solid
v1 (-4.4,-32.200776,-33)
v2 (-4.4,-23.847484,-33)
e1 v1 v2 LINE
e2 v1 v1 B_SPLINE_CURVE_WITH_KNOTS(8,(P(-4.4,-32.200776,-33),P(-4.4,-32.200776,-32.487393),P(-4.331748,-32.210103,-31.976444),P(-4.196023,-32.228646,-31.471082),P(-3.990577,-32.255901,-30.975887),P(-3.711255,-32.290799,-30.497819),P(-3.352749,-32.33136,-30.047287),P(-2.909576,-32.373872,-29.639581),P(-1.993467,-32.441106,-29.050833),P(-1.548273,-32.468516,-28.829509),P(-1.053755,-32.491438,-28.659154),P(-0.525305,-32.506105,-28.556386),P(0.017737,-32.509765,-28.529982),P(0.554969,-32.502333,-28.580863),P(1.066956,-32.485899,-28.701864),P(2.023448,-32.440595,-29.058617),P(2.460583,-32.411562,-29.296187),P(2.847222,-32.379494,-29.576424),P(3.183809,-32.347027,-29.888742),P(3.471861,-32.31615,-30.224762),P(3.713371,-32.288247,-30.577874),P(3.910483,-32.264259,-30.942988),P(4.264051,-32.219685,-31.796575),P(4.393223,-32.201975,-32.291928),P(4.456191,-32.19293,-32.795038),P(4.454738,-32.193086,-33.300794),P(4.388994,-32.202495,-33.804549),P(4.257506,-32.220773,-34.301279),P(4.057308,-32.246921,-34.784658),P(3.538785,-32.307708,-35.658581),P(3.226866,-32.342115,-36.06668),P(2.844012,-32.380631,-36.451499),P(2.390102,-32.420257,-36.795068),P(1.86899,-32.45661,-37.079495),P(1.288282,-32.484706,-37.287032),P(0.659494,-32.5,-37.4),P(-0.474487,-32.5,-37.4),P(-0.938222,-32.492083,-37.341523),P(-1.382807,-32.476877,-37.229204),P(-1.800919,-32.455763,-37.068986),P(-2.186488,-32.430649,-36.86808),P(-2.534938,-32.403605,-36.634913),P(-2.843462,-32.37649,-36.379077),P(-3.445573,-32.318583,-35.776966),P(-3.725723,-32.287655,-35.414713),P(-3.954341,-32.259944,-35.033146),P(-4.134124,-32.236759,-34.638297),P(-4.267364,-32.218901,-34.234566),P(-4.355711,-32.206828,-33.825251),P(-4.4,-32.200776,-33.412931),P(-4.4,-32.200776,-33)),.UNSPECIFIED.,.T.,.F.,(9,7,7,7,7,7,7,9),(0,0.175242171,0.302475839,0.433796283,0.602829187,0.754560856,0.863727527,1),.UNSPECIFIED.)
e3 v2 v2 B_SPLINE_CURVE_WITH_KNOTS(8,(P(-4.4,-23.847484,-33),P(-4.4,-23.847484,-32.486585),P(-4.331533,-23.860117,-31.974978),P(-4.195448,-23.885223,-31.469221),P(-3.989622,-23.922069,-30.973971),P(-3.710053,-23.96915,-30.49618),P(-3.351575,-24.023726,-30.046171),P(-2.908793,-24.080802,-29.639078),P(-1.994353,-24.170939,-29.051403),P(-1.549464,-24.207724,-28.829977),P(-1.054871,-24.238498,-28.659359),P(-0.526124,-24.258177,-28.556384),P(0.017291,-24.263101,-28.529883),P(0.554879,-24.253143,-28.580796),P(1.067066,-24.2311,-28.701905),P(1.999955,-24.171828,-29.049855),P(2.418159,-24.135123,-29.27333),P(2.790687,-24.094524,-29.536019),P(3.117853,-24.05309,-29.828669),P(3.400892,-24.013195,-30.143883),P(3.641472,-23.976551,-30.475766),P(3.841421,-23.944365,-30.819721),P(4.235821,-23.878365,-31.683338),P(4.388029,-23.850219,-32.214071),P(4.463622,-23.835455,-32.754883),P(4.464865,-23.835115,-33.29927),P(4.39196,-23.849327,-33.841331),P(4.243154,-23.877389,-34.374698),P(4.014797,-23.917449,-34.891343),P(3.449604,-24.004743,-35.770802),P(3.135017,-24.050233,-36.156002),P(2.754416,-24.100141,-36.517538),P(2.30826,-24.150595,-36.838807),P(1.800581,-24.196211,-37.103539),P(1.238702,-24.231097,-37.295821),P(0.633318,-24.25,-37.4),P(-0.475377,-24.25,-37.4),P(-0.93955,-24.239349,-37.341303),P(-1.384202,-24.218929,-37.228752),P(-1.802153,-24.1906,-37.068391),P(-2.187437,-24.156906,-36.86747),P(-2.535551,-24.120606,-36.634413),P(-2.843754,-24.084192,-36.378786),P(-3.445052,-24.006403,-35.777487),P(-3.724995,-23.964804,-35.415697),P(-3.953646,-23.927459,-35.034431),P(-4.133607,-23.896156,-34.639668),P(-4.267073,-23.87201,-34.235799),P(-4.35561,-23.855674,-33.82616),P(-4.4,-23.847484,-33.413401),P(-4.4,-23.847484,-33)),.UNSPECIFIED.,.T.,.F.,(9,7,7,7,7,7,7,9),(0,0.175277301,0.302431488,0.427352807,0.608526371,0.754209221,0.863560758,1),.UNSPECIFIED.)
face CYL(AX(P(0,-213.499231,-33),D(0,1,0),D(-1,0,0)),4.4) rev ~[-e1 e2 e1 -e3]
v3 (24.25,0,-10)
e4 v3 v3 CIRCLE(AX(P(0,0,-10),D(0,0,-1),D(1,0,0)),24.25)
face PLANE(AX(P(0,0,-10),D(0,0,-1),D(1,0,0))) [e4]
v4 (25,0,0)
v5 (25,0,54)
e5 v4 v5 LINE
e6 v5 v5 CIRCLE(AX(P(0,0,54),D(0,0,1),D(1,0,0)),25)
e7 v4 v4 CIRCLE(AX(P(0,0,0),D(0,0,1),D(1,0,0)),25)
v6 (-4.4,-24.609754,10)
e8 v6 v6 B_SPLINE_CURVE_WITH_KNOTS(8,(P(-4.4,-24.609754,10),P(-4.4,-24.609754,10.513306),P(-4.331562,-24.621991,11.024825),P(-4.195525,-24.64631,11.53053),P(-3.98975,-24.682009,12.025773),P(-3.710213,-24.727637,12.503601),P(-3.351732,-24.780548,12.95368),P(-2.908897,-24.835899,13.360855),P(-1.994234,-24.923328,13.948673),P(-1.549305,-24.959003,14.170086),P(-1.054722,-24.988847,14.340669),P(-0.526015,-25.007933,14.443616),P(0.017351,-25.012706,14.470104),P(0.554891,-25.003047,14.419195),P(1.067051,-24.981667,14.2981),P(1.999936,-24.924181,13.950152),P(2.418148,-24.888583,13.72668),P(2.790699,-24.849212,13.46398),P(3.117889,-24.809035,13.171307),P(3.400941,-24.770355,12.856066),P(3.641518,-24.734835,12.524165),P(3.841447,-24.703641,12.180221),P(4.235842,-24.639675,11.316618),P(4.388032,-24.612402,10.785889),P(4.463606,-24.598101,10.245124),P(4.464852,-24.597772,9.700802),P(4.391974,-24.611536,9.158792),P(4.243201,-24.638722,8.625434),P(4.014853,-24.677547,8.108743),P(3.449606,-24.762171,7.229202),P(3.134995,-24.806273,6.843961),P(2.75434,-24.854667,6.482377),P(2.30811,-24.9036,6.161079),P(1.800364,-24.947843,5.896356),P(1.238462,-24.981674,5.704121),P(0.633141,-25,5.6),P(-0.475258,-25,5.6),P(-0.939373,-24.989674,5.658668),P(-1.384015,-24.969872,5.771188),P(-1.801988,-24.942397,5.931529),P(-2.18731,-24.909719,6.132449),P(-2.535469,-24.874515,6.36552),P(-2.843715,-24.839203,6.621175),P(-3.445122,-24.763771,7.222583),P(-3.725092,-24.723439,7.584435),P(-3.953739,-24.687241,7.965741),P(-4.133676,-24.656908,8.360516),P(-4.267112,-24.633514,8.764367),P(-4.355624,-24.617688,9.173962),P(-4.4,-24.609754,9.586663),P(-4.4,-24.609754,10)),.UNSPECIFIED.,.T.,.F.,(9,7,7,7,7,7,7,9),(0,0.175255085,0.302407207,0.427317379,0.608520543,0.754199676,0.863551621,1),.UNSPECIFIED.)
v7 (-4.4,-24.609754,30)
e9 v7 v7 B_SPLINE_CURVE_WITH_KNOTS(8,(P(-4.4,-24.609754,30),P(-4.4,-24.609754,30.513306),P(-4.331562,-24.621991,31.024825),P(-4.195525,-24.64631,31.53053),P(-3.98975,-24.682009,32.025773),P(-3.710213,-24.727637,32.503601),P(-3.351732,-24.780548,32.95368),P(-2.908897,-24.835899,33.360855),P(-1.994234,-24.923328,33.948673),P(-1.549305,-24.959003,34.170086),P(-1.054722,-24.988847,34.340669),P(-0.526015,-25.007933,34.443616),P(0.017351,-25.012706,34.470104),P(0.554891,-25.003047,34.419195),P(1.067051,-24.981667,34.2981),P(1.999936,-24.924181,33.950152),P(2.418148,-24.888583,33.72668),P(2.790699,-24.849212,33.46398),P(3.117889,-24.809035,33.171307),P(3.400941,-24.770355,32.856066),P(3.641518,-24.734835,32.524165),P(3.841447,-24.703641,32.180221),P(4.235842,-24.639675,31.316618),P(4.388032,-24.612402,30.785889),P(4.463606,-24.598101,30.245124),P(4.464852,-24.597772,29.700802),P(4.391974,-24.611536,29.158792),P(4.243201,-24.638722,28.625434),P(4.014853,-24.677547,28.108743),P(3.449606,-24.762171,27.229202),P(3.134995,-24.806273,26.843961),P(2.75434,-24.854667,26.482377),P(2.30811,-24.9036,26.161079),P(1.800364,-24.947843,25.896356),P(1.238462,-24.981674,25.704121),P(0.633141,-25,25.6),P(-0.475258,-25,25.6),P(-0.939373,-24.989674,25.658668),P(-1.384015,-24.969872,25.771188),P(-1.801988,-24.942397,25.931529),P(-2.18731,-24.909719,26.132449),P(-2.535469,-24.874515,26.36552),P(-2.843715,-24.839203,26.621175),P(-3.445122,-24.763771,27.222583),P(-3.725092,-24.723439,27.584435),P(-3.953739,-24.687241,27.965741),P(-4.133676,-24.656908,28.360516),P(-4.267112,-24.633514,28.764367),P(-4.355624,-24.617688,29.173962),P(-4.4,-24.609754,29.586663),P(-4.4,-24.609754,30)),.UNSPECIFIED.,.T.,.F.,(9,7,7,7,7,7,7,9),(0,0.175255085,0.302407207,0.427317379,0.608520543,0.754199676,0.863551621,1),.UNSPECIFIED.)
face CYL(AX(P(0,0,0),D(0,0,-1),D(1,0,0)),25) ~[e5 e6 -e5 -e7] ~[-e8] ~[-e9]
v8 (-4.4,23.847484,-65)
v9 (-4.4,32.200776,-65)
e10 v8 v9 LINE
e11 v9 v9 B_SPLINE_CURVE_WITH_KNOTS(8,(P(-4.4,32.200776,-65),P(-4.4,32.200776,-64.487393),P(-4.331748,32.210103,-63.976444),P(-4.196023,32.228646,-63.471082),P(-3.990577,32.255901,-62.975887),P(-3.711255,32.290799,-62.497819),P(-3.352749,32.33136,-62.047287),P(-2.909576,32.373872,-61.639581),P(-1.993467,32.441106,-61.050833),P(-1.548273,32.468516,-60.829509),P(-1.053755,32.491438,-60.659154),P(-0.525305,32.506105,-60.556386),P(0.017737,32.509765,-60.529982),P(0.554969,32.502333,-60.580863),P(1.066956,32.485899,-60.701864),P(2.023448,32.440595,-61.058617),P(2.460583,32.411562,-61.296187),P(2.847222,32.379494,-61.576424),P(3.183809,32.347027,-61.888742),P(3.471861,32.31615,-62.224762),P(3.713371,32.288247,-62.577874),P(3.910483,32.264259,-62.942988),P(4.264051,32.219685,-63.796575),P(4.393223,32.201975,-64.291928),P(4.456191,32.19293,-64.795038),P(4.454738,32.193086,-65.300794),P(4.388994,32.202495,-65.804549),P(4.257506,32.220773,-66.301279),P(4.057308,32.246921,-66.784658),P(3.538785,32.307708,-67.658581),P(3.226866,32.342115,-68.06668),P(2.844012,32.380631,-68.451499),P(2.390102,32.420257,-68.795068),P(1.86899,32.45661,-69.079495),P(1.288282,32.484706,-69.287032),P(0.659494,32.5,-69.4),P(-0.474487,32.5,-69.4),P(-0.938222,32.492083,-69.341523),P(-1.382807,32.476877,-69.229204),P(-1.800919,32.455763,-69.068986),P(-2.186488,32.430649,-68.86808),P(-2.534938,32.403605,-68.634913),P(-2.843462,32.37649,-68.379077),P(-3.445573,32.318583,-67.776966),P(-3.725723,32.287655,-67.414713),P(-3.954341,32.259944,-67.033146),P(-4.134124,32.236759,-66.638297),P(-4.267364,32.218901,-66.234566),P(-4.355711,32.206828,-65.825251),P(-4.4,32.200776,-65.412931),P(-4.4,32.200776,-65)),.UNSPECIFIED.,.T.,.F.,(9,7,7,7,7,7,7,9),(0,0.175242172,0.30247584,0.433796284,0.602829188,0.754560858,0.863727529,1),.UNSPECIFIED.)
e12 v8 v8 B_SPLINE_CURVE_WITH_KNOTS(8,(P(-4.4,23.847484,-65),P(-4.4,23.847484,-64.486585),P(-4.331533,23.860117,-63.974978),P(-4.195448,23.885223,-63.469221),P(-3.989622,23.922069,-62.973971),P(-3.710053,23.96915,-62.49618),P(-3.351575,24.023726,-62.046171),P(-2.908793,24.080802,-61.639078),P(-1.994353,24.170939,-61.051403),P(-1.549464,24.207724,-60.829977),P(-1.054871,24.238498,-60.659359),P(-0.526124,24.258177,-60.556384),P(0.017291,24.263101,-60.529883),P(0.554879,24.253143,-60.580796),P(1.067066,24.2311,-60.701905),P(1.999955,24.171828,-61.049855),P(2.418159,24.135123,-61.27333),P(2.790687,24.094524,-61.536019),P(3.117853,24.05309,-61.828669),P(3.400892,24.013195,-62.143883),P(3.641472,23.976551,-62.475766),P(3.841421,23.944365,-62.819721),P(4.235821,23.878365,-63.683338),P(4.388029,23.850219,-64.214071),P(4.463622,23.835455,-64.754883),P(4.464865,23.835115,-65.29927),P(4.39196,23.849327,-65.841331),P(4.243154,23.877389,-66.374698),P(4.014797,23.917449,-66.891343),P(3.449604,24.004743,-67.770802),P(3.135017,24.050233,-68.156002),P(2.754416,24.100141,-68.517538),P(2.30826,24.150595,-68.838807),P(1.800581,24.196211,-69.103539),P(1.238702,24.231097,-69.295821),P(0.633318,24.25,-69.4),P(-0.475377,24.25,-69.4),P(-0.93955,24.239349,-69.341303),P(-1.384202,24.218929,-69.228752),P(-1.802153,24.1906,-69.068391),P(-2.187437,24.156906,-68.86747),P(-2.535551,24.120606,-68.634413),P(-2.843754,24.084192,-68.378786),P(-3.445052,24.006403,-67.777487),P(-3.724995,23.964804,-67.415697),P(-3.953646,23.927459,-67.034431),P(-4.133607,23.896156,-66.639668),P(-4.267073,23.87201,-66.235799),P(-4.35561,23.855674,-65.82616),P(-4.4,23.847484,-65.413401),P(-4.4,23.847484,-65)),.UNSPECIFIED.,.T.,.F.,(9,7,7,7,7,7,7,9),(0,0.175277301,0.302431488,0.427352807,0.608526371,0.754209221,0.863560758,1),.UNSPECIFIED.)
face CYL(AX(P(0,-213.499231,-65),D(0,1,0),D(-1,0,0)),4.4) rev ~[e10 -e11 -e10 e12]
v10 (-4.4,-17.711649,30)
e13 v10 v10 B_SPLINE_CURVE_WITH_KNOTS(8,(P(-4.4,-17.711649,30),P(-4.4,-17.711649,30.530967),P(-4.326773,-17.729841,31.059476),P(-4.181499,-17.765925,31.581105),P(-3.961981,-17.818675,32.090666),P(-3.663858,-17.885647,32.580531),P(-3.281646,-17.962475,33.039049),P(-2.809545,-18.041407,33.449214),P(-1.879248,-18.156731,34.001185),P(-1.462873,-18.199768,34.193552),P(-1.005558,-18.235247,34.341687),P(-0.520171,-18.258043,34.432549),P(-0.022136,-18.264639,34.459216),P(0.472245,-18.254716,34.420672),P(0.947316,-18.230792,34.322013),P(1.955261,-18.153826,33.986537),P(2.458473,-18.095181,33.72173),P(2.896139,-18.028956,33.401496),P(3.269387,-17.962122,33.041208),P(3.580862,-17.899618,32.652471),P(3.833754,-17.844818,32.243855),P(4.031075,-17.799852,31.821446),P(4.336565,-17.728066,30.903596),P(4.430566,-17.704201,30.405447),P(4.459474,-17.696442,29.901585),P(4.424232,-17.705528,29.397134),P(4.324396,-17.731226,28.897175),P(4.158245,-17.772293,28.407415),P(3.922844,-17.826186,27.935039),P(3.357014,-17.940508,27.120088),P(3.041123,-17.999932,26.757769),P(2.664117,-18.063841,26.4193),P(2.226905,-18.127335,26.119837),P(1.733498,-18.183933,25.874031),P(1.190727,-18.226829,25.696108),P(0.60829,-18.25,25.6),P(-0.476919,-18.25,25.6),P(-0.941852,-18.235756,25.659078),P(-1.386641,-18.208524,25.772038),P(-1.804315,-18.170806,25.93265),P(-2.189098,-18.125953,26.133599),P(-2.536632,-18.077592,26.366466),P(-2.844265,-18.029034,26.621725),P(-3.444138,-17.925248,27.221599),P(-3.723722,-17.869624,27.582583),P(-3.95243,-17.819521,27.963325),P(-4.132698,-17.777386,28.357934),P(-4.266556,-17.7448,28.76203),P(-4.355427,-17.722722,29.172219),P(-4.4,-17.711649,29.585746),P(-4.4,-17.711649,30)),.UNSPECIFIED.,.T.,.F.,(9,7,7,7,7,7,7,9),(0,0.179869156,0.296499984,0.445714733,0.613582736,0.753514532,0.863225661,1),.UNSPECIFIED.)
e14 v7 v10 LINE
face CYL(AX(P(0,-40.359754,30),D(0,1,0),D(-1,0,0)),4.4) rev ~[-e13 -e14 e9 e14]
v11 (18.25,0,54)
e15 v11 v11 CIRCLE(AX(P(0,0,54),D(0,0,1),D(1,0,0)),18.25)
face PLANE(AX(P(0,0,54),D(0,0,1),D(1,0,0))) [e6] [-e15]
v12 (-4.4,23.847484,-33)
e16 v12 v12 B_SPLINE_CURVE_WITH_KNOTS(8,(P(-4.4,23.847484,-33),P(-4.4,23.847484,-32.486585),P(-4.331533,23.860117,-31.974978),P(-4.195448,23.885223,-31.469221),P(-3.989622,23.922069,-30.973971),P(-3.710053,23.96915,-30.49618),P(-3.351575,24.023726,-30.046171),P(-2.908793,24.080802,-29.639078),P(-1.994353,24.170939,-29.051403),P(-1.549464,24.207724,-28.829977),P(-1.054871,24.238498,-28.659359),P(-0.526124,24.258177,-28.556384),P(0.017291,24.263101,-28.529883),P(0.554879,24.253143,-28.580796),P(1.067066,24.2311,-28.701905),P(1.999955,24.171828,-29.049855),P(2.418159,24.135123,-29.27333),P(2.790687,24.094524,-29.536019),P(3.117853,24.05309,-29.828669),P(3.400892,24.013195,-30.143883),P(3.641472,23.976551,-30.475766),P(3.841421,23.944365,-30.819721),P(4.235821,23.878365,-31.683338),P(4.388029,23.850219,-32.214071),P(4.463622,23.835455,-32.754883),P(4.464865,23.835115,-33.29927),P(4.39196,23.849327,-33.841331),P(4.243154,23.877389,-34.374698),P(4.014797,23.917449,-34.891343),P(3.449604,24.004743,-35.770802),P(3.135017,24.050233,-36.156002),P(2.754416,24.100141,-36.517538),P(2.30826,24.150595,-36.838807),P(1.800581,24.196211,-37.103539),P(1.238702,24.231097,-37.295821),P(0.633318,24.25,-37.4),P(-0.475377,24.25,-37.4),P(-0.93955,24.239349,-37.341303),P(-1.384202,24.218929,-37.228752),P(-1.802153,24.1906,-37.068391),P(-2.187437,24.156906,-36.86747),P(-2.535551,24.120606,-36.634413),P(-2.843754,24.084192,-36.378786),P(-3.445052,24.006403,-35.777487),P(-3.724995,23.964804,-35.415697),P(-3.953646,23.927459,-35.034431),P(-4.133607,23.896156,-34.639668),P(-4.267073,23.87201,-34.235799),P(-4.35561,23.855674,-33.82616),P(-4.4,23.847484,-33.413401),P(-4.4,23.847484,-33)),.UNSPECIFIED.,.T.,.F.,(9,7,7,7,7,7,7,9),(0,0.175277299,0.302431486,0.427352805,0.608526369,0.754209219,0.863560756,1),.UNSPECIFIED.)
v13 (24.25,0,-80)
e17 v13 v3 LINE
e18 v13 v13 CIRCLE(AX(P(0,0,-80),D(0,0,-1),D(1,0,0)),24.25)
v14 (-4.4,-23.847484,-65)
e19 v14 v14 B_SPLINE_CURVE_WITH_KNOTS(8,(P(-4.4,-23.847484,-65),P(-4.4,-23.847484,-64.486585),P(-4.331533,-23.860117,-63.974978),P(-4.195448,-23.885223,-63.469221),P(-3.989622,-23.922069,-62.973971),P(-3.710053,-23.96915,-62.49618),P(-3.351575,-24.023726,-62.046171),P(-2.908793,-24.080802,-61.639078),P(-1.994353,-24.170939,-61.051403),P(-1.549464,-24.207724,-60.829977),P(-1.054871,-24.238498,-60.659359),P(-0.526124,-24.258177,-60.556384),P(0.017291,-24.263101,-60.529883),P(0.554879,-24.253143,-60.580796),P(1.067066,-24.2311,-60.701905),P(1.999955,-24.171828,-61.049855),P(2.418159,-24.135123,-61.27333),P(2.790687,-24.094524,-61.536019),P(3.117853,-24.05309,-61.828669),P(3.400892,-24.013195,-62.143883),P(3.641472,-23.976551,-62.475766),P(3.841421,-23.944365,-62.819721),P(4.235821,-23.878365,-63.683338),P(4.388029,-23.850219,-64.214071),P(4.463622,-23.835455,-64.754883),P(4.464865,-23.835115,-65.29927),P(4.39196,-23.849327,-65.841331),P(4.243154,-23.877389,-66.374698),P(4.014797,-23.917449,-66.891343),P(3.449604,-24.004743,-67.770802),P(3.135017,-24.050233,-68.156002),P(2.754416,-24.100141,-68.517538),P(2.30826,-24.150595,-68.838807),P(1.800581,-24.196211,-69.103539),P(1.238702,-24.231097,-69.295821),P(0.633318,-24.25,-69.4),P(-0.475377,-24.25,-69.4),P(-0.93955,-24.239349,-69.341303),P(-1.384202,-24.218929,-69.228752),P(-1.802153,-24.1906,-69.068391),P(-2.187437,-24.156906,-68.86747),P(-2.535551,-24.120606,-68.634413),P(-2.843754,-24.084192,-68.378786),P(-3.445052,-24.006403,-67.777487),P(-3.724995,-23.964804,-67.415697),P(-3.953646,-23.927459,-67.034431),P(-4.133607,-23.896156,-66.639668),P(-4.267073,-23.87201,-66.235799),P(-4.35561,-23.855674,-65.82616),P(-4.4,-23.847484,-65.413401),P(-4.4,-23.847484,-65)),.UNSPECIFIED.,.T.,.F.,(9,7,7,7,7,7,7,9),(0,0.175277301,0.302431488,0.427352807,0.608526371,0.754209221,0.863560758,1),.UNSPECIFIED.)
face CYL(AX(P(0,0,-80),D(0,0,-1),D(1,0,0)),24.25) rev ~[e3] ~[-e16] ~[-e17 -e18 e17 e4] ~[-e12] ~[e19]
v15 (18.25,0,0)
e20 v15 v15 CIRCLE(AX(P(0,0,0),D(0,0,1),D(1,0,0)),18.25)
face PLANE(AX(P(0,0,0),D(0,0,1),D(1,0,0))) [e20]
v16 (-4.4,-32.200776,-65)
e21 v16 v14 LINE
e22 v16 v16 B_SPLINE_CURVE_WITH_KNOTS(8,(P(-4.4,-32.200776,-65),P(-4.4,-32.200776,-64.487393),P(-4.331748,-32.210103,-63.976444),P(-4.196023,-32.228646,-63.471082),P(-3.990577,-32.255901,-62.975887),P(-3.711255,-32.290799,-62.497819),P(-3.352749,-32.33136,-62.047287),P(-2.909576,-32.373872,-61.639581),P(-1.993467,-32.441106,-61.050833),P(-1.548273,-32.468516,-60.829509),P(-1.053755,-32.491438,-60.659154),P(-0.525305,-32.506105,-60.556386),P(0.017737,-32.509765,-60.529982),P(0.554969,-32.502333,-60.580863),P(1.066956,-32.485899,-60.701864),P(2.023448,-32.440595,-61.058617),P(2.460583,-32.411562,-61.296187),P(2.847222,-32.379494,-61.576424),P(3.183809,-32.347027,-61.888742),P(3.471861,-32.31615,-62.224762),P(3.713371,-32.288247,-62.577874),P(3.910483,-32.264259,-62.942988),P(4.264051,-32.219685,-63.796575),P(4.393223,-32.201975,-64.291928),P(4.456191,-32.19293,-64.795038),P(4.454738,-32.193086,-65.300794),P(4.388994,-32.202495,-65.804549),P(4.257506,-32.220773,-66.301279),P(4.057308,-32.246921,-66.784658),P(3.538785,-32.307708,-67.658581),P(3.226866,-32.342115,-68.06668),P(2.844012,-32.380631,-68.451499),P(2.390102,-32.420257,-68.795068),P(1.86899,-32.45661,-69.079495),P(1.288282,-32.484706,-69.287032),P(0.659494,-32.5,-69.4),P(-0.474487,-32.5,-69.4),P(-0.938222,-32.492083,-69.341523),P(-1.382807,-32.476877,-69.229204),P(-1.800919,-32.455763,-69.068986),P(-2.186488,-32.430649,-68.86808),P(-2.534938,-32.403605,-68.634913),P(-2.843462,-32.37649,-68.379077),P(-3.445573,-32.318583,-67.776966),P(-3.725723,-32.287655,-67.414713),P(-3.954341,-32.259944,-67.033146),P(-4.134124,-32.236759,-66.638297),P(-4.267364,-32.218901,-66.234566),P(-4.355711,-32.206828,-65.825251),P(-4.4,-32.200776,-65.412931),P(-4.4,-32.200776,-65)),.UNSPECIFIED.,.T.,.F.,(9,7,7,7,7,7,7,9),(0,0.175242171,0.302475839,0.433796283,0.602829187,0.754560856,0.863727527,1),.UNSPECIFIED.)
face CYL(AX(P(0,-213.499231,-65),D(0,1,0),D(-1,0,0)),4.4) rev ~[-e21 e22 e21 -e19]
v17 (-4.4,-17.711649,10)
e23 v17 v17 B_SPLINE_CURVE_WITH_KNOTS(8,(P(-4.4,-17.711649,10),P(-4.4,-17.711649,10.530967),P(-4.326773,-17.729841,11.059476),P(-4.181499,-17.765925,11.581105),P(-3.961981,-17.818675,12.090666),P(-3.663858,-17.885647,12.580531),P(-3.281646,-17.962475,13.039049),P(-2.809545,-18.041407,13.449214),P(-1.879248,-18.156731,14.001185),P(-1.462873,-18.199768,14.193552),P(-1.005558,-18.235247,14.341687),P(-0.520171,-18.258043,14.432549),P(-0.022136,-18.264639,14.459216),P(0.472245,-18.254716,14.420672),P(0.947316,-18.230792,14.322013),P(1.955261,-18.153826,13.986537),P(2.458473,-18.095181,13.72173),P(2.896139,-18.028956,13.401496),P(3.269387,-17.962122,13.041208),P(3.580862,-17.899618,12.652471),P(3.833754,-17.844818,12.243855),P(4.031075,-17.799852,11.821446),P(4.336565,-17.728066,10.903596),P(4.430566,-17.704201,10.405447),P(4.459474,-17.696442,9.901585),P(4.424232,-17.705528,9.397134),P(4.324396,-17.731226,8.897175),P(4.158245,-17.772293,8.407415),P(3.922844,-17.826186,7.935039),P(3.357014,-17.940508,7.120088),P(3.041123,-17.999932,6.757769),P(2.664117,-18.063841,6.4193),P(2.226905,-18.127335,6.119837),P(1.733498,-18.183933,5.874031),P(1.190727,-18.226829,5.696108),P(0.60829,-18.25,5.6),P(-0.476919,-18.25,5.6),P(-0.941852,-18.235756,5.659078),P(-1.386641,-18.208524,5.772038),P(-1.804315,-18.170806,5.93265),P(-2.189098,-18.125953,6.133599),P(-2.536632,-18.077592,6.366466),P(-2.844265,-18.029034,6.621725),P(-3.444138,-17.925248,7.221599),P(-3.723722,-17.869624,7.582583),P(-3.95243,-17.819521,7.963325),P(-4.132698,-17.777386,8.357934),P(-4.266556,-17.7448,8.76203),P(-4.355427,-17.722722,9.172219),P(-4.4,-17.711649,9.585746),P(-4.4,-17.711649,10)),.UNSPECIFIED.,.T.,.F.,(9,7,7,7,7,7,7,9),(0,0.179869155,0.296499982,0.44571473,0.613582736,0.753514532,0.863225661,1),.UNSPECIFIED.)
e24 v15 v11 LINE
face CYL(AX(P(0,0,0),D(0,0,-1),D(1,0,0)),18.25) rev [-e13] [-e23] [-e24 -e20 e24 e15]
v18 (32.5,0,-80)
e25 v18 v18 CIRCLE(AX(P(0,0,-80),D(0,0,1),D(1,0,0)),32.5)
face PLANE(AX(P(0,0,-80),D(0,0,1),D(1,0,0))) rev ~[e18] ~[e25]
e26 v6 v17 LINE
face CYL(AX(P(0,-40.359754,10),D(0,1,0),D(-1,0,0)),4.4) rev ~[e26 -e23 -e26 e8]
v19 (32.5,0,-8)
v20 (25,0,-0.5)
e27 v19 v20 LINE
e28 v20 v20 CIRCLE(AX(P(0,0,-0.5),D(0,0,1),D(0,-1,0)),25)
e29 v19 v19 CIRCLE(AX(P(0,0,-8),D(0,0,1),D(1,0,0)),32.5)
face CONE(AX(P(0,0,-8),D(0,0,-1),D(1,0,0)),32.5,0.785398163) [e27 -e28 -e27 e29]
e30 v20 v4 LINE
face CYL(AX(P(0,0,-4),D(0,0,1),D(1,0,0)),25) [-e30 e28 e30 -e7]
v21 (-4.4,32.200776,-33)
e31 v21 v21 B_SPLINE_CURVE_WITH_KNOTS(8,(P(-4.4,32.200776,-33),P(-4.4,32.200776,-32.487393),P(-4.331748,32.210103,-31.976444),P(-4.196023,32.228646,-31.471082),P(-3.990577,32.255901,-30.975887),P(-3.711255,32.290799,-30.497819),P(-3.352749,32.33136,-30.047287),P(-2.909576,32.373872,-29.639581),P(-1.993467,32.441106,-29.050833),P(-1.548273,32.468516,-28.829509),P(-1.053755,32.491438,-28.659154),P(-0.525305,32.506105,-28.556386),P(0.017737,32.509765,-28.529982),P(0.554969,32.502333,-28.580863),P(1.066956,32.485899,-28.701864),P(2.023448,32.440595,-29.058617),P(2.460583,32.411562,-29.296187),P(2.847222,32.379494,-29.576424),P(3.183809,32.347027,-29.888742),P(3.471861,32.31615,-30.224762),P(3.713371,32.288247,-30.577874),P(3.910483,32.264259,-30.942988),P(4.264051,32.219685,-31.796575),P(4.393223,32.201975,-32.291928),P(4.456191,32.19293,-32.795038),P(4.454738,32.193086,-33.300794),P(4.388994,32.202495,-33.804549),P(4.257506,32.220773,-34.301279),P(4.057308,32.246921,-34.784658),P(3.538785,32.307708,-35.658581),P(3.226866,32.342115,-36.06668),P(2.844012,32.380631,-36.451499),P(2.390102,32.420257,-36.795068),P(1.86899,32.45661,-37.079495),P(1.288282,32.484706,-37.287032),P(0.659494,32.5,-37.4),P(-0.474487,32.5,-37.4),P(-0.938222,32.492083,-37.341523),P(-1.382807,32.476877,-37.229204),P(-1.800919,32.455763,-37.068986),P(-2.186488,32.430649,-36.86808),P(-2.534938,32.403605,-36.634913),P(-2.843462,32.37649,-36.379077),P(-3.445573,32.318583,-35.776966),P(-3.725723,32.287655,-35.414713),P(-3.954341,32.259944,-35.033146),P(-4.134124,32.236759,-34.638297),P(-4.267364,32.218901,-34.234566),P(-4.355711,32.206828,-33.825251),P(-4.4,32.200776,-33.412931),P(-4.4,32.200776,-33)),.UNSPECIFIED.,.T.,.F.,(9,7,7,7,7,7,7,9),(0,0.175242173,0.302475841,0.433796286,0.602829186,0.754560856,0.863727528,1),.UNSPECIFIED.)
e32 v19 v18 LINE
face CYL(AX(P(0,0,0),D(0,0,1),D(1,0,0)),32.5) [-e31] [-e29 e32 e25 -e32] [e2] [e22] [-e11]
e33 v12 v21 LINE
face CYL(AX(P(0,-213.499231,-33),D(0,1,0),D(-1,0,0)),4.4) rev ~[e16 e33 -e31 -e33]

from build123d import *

# Parameters (mm, degrees)
F0_R        = 25
F0_R_2      = 18.25
F1_DEPTH    = 54
F4_D        = 8.8
F4_DEPTH    = 15.75
F4_START    = 1.3902459
F4_TIP      = 2.6437867237
F5_R        = 32.5
F6_DEPTH    = 80
F7_R        = 24.25
F8_DEPTH    = 70
F9_S5_R     = 25
F9_T6_DEPTH = 48
F12_D       = 8.8


# Not quite as in the source:
# - a fillet or chamfer that OpenCascade refuses, or shapes differently, is made with other operations: its cross-section is extruded or revolved along the edge and cut away or added


with BuildPart() as f1:
    # F0 (on Top) → F1 (new body)
    with BuildSketch(Plane.XY):
        Circle(F0_R)
        Circle(F0_R_2, mode=Mode.SUBTRACT)
    extrude(amount=F1_DEPTH)

    # F4
    # its depths count from where the whole tool has entered the part; down to there all is cleared
    with Locations(Plane.XZ.offset(26).offset(-F4_START)):
        with Locations((0, 10), (0, 30)):
            Hole(F4_D / 2, depth=F4_DEPTH)
            with Locations((0, 0, -(F4_DEPTH + F4_TIP / 2))):  # 118° drill point
                Cone(0, F4_D / 2, F4_TIP, mode=Mode.SUBTRACT)

    # F5 (on face) → F6 (join)
    with BuildSketch(Plane.XY):
        Circle(F5_R)
    extrude(amount=-F6_DEPTH)

    # F7 (on face) → F8 (cut)
    with BuildSketch(Plane(origin=(0, 0, -80), x_dir=(1, 0, 0), z_dir=(0, 0, -1))):
        Circle(F7_R)
    extrude(amount=-F8_DEPTH, mode=Mode.SUBTRACT)

    # F9: chamfer of 8 on 1 edges, made by hand


with BuildPart() as f9_tool2:
    # F9_s3 → F9_t4 (revolve)
    with BuildSketch(Plane.XZ):
        Polygon((32.5, -8), (24.5, 0), (32.5, 0), align=None)
    revolve(axis=Axis((0, 0, 0), (0, 0, 1)))

    # F9_s5 → F9_t6 (cut, symmetric)
    with BuildSketch(Plane.XY.offset(-4)):
        Circle(F9_S5_R)
    extrude(amount=F9_T6_DEPTH, both=True, mode=Mode.SUBTRACT)


with BuildPart() as f1_1:
    add(f1.part)

    # F9_t1: cut F9_tool2
    add(f9_tool2.part, mode=Mode.SUBTRACT)

    # F12 (through all)
    with Locations(Plane.XZ.offset(51)):
        with Locations((0, -33), (0, -65)):
            Hole(F12_D / 2)


solid = f1_1.part
